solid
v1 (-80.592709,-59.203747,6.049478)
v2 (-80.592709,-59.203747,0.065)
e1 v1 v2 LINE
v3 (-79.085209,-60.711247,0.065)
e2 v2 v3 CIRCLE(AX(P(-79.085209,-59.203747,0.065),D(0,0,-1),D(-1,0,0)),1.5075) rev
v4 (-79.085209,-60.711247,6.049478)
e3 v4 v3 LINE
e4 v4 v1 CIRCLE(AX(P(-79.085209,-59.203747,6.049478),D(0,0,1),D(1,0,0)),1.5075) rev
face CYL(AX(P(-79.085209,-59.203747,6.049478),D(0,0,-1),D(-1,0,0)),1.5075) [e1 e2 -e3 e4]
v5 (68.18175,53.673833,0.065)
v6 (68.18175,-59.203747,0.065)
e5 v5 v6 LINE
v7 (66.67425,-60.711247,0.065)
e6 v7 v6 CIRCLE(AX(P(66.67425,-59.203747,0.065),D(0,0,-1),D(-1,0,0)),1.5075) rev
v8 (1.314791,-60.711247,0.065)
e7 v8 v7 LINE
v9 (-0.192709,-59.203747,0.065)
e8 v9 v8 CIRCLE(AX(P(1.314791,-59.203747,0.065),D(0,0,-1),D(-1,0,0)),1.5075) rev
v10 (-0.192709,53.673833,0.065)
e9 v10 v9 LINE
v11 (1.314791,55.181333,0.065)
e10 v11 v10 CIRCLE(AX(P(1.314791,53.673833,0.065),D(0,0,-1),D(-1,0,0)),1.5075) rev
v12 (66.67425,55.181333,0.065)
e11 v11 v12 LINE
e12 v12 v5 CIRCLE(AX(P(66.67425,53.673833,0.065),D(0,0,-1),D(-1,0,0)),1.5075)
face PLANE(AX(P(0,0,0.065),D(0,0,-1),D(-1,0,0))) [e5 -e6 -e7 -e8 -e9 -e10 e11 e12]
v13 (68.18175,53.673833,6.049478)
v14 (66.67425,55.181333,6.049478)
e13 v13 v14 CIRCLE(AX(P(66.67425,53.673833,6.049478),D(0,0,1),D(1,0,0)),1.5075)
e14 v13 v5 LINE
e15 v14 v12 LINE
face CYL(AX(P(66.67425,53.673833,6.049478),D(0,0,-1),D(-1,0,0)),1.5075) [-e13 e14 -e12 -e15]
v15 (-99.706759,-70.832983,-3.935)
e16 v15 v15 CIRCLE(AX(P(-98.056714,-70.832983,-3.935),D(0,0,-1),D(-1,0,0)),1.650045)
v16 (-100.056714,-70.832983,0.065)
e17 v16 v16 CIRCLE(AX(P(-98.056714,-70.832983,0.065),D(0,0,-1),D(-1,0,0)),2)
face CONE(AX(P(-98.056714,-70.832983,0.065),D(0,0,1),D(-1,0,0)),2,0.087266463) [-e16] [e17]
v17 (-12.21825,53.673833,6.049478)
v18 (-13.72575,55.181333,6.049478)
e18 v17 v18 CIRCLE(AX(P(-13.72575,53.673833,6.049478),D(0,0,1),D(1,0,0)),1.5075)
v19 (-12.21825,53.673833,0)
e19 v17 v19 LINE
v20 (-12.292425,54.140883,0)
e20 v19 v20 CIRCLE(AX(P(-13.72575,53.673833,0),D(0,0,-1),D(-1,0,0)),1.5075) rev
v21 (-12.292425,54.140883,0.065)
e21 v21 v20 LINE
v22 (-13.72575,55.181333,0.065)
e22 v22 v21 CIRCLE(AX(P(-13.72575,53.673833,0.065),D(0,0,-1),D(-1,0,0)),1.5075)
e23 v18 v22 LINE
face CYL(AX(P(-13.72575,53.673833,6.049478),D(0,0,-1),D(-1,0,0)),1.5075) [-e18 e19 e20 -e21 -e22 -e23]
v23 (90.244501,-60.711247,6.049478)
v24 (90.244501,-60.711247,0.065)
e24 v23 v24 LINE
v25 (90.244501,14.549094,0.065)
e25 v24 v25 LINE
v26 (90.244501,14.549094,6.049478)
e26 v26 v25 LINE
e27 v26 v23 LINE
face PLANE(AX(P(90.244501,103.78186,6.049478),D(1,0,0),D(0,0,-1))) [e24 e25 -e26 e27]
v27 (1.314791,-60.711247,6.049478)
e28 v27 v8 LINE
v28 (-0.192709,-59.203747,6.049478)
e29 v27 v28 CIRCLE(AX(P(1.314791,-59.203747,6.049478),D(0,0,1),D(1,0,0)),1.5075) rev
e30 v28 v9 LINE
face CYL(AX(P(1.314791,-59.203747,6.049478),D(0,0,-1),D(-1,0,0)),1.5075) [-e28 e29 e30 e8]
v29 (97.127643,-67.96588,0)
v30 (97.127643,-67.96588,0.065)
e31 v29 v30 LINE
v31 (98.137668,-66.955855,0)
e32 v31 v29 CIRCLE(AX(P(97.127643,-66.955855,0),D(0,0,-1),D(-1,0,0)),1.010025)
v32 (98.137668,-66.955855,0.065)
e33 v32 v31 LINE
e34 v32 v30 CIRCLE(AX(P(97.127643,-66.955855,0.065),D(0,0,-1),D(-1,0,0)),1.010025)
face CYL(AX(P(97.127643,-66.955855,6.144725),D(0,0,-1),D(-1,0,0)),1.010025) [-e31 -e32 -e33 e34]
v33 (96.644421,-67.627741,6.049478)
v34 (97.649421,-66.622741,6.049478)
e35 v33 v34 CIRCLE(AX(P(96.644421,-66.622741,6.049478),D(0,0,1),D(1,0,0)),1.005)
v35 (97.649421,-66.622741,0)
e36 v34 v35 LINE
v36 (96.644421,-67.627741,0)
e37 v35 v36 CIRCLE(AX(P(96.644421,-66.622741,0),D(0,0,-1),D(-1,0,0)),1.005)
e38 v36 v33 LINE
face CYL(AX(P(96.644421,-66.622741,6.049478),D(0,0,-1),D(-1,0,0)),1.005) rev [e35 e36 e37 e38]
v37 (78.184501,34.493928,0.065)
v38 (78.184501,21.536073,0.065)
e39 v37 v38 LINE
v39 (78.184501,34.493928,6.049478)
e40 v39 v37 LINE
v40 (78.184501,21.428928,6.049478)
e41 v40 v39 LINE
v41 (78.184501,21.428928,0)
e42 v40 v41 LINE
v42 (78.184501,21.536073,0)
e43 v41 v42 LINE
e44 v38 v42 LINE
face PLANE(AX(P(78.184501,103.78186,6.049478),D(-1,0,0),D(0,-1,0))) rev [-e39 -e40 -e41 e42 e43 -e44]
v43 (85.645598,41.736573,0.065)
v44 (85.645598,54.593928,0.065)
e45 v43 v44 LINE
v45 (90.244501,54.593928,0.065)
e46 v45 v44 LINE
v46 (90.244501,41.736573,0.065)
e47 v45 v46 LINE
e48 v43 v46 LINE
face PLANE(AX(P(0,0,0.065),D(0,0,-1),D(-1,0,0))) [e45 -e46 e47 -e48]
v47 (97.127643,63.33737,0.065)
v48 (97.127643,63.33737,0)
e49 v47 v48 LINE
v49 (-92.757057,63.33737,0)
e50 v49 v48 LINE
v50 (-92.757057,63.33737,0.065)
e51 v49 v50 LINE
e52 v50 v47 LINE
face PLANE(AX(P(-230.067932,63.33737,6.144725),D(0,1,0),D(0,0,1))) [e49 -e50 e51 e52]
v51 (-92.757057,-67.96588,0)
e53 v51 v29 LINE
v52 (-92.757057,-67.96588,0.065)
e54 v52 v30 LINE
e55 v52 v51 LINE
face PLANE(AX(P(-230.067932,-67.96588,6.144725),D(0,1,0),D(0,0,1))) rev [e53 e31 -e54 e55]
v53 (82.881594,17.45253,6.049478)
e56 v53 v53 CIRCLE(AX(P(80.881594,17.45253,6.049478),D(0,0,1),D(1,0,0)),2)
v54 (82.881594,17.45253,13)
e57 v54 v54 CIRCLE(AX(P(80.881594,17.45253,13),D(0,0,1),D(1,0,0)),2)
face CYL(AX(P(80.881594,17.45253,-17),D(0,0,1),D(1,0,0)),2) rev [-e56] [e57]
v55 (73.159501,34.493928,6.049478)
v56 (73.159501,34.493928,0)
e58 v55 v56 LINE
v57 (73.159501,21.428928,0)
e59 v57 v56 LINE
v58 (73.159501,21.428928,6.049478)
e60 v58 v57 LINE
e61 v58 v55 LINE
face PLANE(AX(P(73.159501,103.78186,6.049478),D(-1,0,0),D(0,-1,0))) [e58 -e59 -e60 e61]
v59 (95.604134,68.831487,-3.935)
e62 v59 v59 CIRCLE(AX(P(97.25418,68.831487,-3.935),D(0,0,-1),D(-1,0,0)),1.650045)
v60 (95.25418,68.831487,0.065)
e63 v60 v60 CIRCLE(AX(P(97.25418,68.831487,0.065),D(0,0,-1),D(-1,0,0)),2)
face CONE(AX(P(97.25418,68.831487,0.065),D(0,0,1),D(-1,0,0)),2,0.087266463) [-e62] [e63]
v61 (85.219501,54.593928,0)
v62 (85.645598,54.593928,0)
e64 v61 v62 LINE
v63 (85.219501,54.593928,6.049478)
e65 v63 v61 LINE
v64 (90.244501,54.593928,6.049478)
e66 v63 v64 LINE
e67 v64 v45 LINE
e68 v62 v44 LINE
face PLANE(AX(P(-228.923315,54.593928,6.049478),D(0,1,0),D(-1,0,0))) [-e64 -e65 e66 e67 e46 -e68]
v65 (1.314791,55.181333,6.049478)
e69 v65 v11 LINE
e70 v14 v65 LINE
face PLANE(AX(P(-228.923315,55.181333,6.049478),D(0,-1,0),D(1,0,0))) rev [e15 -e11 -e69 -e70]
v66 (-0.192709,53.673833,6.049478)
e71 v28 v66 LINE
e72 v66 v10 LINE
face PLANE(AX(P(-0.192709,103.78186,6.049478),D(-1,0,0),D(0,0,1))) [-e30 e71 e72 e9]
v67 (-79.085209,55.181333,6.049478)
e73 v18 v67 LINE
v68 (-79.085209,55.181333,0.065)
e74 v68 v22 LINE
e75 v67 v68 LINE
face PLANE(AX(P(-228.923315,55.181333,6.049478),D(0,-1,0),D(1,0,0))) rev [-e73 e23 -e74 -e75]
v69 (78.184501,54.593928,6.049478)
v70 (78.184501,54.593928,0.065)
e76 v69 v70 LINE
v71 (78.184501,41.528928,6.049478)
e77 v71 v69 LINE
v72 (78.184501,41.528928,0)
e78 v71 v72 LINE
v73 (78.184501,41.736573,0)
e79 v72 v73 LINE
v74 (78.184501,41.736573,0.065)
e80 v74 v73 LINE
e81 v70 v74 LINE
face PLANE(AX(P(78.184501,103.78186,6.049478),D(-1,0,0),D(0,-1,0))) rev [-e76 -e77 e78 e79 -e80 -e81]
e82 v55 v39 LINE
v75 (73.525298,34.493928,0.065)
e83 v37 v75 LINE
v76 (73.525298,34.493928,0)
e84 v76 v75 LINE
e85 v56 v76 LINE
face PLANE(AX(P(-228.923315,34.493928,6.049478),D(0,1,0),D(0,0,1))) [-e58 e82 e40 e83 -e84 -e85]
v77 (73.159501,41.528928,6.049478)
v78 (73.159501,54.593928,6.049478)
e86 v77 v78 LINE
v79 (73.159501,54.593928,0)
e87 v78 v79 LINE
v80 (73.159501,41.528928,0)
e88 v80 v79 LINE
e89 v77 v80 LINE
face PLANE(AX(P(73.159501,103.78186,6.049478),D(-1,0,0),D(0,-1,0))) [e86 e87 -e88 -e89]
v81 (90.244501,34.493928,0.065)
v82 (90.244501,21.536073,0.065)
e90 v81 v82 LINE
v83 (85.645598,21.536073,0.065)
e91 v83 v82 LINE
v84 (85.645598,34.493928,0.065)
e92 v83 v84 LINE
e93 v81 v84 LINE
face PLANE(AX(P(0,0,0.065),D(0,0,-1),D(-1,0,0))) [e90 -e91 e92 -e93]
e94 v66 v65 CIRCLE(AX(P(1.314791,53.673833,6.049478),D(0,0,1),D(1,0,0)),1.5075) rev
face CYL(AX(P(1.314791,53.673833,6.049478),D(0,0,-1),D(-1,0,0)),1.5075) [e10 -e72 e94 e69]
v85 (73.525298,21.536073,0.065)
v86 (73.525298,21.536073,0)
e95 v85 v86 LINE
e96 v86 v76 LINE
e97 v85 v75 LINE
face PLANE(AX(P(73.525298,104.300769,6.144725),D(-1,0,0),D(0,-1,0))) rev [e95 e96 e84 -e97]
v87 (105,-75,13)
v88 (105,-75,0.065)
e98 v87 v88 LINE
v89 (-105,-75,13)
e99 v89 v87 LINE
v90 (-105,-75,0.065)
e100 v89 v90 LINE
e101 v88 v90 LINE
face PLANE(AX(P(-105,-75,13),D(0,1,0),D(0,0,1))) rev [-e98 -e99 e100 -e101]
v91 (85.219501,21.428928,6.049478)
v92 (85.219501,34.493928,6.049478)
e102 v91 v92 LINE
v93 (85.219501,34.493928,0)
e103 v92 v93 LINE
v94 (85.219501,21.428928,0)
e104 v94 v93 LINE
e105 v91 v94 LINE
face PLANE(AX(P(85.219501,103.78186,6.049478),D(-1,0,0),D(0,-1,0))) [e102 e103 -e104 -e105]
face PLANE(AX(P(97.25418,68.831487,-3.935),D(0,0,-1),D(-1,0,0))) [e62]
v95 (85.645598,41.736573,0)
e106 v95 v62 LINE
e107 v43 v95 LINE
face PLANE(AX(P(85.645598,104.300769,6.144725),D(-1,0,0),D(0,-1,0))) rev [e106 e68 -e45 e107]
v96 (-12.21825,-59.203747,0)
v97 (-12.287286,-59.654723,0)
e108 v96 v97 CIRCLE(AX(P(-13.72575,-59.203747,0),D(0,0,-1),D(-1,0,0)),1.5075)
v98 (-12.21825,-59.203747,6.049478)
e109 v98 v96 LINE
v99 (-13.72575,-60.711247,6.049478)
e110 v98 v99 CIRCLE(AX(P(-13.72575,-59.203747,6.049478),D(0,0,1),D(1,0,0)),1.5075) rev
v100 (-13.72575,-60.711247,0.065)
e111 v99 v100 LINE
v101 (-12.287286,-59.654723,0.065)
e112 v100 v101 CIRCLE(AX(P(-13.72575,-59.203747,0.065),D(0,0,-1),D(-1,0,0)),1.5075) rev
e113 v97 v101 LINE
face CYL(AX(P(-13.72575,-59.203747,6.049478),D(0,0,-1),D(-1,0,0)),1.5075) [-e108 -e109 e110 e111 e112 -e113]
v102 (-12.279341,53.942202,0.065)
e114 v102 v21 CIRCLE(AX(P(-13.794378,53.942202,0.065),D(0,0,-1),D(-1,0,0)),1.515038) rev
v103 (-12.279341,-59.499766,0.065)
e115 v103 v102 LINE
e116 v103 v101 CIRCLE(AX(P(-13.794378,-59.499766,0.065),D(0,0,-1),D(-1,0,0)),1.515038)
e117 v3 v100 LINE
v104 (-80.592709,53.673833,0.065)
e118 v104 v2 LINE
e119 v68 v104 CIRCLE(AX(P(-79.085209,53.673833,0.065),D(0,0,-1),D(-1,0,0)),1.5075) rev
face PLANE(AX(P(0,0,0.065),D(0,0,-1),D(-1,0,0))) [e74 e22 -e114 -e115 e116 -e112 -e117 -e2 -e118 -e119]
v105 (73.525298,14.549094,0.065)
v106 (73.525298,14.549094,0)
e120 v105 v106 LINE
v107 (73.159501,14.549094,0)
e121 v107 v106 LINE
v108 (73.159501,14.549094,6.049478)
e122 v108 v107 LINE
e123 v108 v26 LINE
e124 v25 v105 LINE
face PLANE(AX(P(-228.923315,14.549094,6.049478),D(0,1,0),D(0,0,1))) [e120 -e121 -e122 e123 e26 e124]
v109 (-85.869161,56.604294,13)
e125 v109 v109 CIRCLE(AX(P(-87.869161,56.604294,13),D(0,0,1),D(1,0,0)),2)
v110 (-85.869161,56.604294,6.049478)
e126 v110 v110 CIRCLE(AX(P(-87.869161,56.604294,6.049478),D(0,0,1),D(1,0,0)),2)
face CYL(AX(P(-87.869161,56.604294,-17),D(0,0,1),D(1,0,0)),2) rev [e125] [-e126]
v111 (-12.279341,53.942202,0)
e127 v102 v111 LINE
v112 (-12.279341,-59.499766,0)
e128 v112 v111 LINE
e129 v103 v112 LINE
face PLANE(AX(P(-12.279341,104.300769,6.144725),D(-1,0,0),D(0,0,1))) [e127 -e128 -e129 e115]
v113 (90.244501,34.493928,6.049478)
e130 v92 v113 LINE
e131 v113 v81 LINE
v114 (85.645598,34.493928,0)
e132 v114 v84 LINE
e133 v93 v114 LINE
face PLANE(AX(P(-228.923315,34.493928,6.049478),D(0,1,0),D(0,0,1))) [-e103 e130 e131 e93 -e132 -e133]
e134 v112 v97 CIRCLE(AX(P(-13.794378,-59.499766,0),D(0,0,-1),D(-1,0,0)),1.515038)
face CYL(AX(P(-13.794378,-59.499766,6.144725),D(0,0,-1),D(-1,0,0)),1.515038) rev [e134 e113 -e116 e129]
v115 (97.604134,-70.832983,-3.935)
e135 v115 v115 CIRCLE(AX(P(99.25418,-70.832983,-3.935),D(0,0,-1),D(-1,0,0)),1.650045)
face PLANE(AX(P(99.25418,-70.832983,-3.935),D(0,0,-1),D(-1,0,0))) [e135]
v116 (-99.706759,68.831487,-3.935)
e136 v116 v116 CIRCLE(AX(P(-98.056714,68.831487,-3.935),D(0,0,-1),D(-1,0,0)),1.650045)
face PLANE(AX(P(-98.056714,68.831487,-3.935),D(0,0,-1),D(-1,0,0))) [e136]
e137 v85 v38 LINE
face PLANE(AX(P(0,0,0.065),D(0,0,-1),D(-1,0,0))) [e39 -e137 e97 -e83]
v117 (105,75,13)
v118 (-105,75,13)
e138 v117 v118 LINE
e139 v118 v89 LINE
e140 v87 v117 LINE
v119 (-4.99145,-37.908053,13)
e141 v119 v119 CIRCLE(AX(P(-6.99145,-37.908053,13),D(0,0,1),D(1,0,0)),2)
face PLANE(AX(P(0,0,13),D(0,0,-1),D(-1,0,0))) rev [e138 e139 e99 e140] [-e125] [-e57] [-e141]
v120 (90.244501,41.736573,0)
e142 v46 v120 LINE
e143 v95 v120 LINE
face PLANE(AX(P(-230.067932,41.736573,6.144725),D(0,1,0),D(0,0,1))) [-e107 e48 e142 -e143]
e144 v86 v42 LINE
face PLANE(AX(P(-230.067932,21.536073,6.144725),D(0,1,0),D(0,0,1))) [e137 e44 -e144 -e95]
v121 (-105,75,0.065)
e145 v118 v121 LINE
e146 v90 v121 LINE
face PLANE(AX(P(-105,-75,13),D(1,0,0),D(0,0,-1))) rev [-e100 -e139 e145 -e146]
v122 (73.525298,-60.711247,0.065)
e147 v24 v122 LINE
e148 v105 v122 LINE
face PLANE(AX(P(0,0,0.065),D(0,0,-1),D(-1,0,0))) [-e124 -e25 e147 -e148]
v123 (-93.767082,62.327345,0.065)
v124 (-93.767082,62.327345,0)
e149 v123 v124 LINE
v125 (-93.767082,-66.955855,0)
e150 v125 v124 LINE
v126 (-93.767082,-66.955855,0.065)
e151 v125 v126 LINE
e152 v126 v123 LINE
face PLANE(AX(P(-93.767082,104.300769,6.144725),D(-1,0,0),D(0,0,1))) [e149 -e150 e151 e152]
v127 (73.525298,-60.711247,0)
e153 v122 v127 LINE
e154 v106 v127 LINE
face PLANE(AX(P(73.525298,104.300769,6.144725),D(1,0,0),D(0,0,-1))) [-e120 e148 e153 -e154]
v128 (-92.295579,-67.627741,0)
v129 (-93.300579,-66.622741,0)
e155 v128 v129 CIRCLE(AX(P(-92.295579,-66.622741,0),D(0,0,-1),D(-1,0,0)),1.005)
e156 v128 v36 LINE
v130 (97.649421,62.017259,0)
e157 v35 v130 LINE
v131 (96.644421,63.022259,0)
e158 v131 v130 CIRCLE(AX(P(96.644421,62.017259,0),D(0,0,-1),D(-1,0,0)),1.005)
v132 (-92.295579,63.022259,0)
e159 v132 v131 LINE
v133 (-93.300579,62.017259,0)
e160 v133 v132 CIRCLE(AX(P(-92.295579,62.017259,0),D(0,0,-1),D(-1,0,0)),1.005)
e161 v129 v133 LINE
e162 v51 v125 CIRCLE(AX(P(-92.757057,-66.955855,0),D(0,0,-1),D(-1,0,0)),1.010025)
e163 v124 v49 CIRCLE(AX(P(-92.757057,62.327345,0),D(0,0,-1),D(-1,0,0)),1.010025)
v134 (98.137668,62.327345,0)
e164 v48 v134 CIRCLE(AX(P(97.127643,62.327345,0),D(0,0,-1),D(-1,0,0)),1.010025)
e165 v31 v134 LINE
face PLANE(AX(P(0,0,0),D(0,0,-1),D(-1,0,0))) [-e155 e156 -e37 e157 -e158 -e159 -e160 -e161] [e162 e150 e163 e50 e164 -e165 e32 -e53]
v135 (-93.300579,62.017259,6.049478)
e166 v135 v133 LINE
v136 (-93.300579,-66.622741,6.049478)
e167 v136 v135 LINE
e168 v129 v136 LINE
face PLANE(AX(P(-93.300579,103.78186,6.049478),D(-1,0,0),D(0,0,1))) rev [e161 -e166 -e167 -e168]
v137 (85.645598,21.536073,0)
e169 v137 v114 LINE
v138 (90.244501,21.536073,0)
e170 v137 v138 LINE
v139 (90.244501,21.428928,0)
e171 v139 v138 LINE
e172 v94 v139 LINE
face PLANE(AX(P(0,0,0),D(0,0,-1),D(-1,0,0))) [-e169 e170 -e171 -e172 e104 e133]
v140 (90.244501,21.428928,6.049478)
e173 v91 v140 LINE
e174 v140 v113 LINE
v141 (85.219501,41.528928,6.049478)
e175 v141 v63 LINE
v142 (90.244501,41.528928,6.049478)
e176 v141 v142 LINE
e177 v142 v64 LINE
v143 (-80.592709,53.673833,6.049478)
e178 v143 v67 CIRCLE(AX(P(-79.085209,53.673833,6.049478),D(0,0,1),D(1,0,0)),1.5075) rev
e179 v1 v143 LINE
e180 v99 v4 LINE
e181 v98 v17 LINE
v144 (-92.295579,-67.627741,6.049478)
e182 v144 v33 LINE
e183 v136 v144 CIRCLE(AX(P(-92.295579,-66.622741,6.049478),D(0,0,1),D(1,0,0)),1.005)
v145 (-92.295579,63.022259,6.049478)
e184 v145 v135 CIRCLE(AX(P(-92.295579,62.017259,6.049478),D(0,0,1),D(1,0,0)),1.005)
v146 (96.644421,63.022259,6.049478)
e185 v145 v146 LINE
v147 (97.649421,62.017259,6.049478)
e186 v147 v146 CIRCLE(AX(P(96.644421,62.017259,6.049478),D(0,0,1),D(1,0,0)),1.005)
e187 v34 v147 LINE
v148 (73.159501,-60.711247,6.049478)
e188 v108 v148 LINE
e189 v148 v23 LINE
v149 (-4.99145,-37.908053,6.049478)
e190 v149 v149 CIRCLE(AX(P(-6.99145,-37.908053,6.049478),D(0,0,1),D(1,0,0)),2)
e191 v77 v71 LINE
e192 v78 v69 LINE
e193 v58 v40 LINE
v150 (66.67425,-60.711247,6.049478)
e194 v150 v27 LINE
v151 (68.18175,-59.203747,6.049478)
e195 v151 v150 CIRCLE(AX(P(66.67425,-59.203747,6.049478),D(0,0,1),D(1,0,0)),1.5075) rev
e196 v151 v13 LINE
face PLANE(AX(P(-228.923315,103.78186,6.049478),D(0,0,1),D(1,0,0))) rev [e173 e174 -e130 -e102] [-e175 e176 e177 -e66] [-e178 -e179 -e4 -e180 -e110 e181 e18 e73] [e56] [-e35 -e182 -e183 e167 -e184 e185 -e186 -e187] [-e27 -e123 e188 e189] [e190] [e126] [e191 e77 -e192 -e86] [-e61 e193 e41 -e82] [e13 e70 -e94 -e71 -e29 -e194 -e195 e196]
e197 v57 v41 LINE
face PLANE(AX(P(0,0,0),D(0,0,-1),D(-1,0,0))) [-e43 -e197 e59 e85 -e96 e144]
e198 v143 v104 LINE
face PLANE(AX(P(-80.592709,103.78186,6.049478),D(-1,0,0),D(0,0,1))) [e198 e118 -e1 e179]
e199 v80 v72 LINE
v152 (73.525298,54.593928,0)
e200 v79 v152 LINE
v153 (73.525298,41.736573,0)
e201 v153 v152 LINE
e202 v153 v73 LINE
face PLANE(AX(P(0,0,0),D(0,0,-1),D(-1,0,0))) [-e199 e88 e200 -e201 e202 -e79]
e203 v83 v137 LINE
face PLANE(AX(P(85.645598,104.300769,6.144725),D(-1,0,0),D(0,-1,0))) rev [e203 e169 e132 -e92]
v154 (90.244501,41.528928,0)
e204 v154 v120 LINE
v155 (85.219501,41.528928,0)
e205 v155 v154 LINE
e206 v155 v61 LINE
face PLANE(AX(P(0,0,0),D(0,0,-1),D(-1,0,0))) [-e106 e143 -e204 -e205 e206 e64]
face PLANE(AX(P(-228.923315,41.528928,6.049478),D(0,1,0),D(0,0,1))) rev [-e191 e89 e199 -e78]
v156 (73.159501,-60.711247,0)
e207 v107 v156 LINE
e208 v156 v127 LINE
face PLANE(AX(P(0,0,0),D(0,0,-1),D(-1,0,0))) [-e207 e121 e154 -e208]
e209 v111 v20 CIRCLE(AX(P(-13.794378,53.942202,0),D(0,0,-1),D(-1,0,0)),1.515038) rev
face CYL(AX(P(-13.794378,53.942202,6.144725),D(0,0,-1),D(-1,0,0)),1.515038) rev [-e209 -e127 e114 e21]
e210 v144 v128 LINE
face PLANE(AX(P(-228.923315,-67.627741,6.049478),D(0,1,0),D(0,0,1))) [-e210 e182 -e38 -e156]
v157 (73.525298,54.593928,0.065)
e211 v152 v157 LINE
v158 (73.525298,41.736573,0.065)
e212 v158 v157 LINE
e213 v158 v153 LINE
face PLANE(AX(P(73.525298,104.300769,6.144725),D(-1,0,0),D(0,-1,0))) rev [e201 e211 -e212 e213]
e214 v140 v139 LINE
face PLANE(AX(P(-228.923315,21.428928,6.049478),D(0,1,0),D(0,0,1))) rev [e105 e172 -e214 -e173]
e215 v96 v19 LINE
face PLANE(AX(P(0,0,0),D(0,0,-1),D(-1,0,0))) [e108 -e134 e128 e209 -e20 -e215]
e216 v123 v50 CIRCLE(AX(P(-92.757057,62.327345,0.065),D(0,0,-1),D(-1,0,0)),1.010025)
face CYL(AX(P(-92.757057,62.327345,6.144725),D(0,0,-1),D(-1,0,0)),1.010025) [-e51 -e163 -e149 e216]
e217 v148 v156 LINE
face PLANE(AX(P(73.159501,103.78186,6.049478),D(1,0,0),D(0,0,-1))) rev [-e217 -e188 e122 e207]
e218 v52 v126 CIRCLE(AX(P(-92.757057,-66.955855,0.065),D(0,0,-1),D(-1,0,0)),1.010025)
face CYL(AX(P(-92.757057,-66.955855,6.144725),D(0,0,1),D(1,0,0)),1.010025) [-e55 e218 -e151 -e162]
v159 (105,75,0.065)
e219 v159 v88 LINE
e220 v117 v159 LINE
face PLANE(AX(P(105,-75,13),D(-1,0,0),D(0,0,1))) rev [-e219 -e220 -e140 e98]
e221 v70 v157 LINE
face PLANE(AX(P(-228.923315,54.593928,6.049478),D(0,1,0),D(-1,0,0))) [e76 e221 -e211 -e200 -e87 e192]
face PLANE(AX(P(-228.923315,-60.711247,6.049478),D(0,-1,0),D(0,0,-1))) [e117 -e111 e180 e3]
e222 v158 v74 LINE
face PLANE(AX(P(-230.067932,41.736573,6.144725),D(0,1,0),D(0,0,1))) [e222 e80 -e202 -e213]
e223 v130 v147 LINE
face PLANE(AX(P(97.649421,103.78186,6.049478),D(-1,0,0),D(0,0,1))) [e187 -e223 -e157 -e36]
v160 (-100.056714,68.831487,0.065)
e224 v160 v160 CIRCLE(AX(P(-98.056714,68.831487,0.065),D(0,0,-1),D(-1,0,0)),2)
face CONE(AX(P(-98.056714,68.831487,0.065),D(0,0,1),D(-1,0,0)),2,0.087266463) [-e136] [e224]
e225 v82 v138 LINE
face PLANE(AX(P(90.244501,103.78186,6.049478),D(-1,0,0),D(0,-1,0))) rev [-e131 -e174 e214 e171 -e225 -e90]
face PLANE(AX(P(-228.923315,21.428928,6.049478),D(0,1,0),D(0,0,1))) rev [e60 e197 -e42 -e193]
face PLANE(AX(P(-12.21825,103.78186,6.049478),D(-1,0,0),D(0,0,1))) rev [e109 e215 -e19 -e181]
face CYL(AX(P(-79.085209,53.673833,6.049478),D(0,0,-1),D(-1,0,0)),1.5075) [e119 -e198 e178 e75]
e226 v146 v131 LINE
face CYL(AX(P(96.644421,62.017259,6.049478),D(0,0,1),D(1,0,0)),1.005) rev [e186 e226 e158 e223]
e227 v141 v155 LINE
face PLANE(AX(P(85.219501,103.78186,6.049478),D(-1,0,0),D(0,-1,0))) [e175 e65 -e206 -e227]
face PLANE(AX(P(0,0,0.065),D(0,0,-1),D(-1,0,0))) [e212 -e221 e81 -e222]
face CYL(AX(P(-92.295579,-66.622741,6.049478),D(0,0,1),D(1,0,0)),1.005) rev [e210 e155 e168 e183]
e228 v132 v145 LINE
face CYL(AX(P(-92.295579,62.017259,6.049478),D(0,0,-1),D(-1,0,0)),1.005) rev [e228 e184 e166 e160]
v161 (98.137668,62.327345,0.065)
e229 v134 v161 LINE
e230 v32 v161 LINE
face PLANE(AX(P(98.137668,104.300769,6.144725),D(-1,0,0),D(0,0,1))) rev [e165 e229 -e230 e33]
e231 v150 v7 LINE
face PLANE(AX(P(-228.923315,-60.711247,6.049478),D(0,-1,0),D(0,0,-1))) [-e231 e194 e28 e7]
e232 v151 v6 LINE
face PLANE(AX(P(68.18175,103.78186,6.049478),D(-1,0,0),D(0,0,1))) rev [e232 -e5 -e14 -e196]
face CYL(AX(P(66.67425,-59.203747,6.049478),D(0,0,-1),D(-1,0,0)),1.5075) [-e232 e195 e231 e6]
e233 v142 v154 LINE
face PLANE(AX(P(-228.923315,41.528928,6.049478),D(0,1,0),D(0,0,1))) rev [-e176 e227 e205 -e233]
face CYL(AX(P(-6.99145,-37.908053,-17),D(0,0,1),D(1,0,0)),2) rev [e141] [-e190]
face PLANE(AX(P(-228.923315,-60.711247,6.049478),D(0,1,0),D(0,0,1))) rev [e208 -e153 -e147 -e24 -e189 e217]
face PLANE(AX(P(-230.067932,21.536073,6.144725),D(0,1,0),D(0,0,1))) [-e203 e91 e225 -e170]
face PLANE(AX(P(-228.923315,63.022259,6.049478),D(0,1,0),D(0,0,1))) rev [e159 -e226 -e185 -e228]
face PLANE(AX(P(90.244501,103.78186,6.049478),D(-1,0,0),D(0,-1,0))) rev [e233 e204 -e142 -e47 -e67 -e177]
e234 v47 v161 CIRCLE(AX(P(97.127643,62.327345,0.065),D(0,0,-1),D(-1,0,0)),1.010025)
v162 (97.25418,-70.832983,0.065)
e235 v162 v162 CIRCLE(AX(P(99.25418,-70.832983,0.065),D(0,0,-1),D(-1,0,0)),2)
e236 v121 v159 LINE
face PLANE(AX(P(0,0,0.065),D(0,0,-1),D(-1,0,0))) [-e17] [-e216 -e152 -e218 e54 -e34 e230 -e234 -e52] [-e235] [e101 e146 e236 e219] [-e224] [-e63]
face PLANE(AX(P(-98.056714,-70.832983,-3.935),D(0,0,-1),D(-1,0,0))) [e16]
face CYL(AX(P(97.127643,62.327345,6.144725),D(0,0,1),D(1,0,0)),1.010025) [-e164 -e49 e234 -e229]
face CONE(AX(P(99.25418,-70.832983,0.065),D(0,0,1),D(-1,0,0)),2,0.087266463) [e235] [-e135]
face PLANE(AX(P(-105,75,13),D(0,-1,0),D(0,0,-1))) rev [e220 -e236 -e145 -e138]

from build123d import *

# Parameters (mm, degrees)
ESQUISSE1_W                  = 210
ESQUISSE1_H                  = 150
BOSS_EXTRU_1_DEPTH           = 13
EMPREINTE1_OUTLINE_W         = 17.085
EMPREINTE1_OUTLINE_H         = 75.260341386
EMPREINTE1_OUTLINE_W_2       = 5.025
EMPREINTE1_OUTLINE_H_2       = 13.065
EMPREINTE1_DEPTH             = 6.049477858
ESQUISSE2_R                  = 2
ENL_V_MAT_EXTRU_1_DEPTH      = 30
ESQUISSE3_R                  = 2
BOSS_EXTRU_2_DEPTH           = 4
BOSS_EXTRU_2_DRAFT           = 5
BOSS_EXTRU_2_PROFILE_2_DEPTH = 4
BOSS_EXTRU_2_PROFILE_2_DRAFT = 5
BOSS_EXTRU_2_PROFILE_3_DEPTH = 4
BOSS_EXTRU_2_PROFILE_3_DRAFT = 5
BOSS_EXTRU_2_PROFILE_4_DEPTH = 4
BOSS_EXTRU_2_PROFILE_4_DRAFT = 5
EMPREINTE2_START             = -4
EMPREINTE2_OUTLINE_W         = 210
EMPREINTE2_OUTLINE_H         = 150
EMPREINTE2_OUTLINE_W_2       = 4.598902496
EMPREINTE2_OUTLINE_H_2       = 12.85735536
EMPREINTE2_OUTLINE_H_3       = 12.95785536
EMPREINTE2_OUTLINE_W_3       = 4.659202496
EMPREINTE2_OUTLINE_W_4       = 16.719202496
EMPREINTE2_OUTLINE_H_4       = 75.260341386
EMPREINTE2_DEPTH             = 4.065
ESQUISSE4_R                  = 2
BOSS_EXTRU_3_DEPTH           = 4
BOSS_EXTRU_3_DRAFT           = 5
BOSS_EXTRU_3_PROFILE_2_DEPTH = 4
BOSS_EXTRU_3_PROFILE_2_DRAFT = 5
BOSS_EXTRU_3_PROFILE_3_DEPTH = 4
BOSS_EXTRU_3_PROFILE_3_DRAFT = 5
BOSS_EXTRU_3_PROFILE_4_DEPTH = 4
BOSS_EXTRU_3_PROFILE_4_DRAFT = 5


# Read off the part's stored shape, not the designer's step: Empreinte1, Empreinte2
with BuildPart() as part:
    # Esquisse1 → Boss.-Extru.1 (new body)
    with BuildSketch(Plane.XY):
        Rectangle(ESQUISSE1_W, ESQUISSE1_H)
    extrude(amount=BOSS_EXTRU_1_DEPTH)

    # Empreinte1 outline → Empreinte1 (cut)
    with BuildSketch(Plane.XY):
        with BuildLine():
            Line((-92.295579376, -67.627741397), (96.644420624, -67.627741397))
            ThreePointArc((96.644420624, -67.627741397), (97.355062939, -67.333383712), (97.649420624, -66.622741397))
            Line((97.649420624, -66.622741397), (97.649420624, 62.017258603))
            ThreePointArc((97.649420624, 62.017258603), (97.35506294, 62.727900918), (96.644420624, 63.022258603))
            Line((96.644420624, 63.022258603), (-92.295579376, 63.022258603))
            ThreePointArc((-92.295579376, 63.022258603), (-93.006221692, 62.727900918), (-93.300579376, 62.017258603))
            Line((-93.300579376, 62.017258603), (-93.300579376, -66.622741397))
            ThreePointArc((-93.300579376, -66.622741397), (-93.006221691, -67.333383712), (-92.295579376, -67.627741397))
        make_face()
        with BuildLine():
            Line((-13.725749511, -60.711247466), (-79.085208702, -60.711247466))
            ThreePointArc((-79.085208702, -60.711247466), (-80.151172175, -60.269710939), (-80.592708702, -59.203747466))
            Line((-80.592708702, -59.203747466), (-80.592708702, 53.673832534))
            ThreePointArc((-80.592708702, 53.673832534), (-80.151172175, 54.739796007), (-79.085208702, 55.181332534))
            Line((-79.085208702, 55.181332534), (-13.725749511, 55.181332534))
            ThreePointArc((-13.725749511, 55.181332534), (-12.659786038, 54.739796007), (-12.218249511, 53.673832534))
            Line((-12.218249511, 53.673832534), (-12.218249511, -59.203747466))
            ThreePointArc((-12.218249511, -59.203747466), (-12.659786038, -60.269710939), (-13.725749511, -60.711247466))
        make_face(mode=Mode.SUBTRACT)
        with BuildLine():
            Line((66.674250489, -60.711247466), (1.314791298, -60.711247466))
            ThreePointArc((1.314791298, -60.711247466), (0.248827825, -60.269710939), (-0.192708702, -59.203747466))
            Line((-0.192708702, -59.203747466), (-0.192708702, 53.673832534))
            ThreePointArc((-0.192708702, 53.673832534), (0.248827825, 54.739796007), (1.314791298, 55.181332534))
            Line((1.314791298, 55.181332534), (66.674250489, 55.181332534))
            ThreePointArc((66.674250489, 55.181332534), (67.740213962, 54.739796007), (68.181750489, 53.673832534))
            Line((68.181750489, 53.673832534), (68.181750489, -59.203747466))
            ThreePointArc((68.181750489, -59.203747466), (67.740213962, -60.269710939), (66.674250489, -60.711247466))
        make_face(mode=Mode.SUBTRACT)
        with Locations((81.702000923, -23.081076773)):
            Rectangle(EMPREINTE1_OUTLINE_W, EMPREINTE1_OUTLINE_H, mode=Mode.SUBTRACT)
        with Locations((75.672000923, 27.96142794)):
            Rectangle(EMPREINTE1_OUTLINE_W_2, EMPREINTE1_OUTLINE_H_2, mode=Mode.SUBTRACT)
        with Locations((87.732000923, 27.96142794)):
            Rectangle(EMPREINTE1_OUTLINE_W_2, EMPREINTE1_OUTLINE_H_2, mode=Mode.SUBTRACT)
        with Locations((75.672000923, 48.06142794)):
            Rectangle(EMPREINTE1_OUTLINE_W_2, EMPREINTE1_OUTLINE_H_2, mode=Mode.SUBTRACT)
        with Locations((87.732000923, 48.06142794)):
            Rectangle(EMPREINTE1_OUTLINE_W_2, EMPREINTE1_OUTLINE_H_2, mode=Mode.SUBTRACT)
    extrude(amount=EMPREINTE1_DEPTH, mode=Mode.SUBTRACT)

    # Esquisse2 → Enlèv. mat.-Extru.1 (cut)
    with BuildSketch(Plane.XY.offset(13)):
        with Locations((-87.86916098, 56.604294197)):
            Circle(ESQUISSE2_R)
        with Locations((80.881593918, 17.452530083)):
            Circle(ESQUISSE2_R)
        with Locations((-6.991449763, -37.908053034)):
            Circle(ESQUISSE2_R)
    extrude(amount=-ENL_V_MAT_EXTRU_1_DEPTH, mode=Mode.SUBTRACT)


with BuildPart() as boss_extru_2_tool:
    # Esquisse3 → Boss.-Extru.2 (with draft: the straight prism first)
    with BuildSketch(Plane(origin=(0, 0, 0), x_dir=(-1, 0, 0), z_dir=(0, 0, -1))):
        with Locations((-100.155653932, 68.889368264)):
            Circle(ESQUISSE3_R)
    extrude(amount=BOSS_EXTRU_2_DEPTH)
    # Boss.-Extru.2: the draft: its side faces are tilted about the plane it starts from
    boss_extru_2_sides = [boss_extru_2_tool.faces().sort_by_distance(p)[0] for p in [
        (102.155653932, 68.889368264, -2),
    ]]
    draft(boss_extru_2_sides, Plane(origin=(0, 0, 0), x_dir=(-1, 0, 0), z_dir=(0, 0, -1)), BOSS_EXTRU_2_DRAFT)


with BuildPart() as part_1:
    add(part.part)

    # Boss.-Extru.2: add boss_extru_2_tool
    add(boss_extru_2_tool.part)


with BuildPart() as boss_extru_2_profile_2_tool:
    # Esquisse3 → Boss.-Extru.2 profile 2 (with draft: the straight prism first)
    with BuildSketch(Plane(origin=(0, 0, 0), x_dir=(-1, 0, 0), z_dir=(0, 0, -1))):
        with Locations((98.736763649, 70.889368264)):
            Circle(ESQUISSE3_R)
    extrude(amount=BOSS_EXTRU_2_PROFILE_2_DEPTH)
    # Boss.-Extru.2 profile 2: the draft: its side faces are tilted about the plane it starts from
    boss_extru_2_profile_2_sides = [boss_extru_2_profile_2_tool.faces().sort_by_distance(p)[0] for p in [
        (-96.736763649, 70.889368264, -2),
    ]]
    draft(boss_extru_2_profile_2_sides, Plane(origin=(0, 0, 0), x_dir=(-1, 0, 0), z_dir=(0, 0, -1)), BOSS_EXTRU_2_PROFILE_2_DRAFT)


with BuildPart() as part_2:
    add(part_1.part)

    # Boss.-Extru.2 profile 2: add boss_extru_2_profile_2_tool
    add(boss_extru_2_profile_2_tool.part)


with BuildPart() as boss_extru_2_profile_3_tool:
    # Esquisse3 → Boss.-Extru.2 profile 3 (with draft: the straight prism first)
    with BuildSketch(Plane(origin=(0, 0, 0), x_dir=(-1, 0, 0), z_dir=(0, 0, -1))):
        with Locations((98.736763649, -70.420119621)):
            Circle(ESQUISSE3_R)
    extrude(amount=BOSS_EXTRU_2_PROFILE_3_DEPTH)
    # Boss.-Extru.2 profile 3: the draft: its side faces are tilted about the plane it starts from
    boss_extru_2_profile_3_sides = [boss_extru_2_profile_3_tool.faces().sort_by_distance(p)[0] for p in [
        (-96.736763649, -70.420119621, -2),
    ]]
    draft(boss_extru_2_profile_3_sides, Plane(origin=(0, 0, 0), x_dir=(-1, 0, 0), z_dir=(0, 0, -1)), BOSS_EXTRU_2_PROFILE_3_DRAFT)


with BuildPart() as part_3:
    add(part_2.part)

    # Boss.-Extru.2 profile 3: add boss_extru_2_profile_3_tool
    add(boss_extru_2_profile_3_tool.part)


with BuildPart() as boss_extru_2_profile_4_tool:
    # Esquisse3 → Boss.-Extru.2 profile 4 (with draft: the straight prism first)
    with BuildSketch(Plane(origin=(0, 0, 0), x_dir=(-1, 0, 0), z_dir=(0, 0, -1))):
        with Locations((-36.278038097, -50.689996009)):
            Circle(ESQUISSE3_R)
    extrude(amount=BOSS_EXTRU_2_PROFILE_4_DEPTH)
    # Boss.-Extru.2 profile 4: the draft: its side faces are tilted about the plane it starts from
    boss_extru_2_profile_4_sides = [boss_extru_2_profile_4_tool.faces().sort_by_distance(p)[0] for p in [
        (38.278038097, -50.689996009, -2),
    ]]
    draft(boss_extru_2_profile_4_sides, Plane(origin=(0, 0, 0), x_dir=(-1, 0, 0), z_dir=(0, 0, -1)), BOSS_EXTRU_2_PROFILE_4_DRAFT)


with BuildPart() as part_4:
    add(part_3.part)

    # Boss.-Extru.2 profile 4: add boss_extru_2_profile_4_tool
    add(boss_extru_2_profile_4_tool.part)

    # Empreinte2 outline → Empreinte2 (cut)
    # profile 1 of 8: a face of its own
    with BuildSketch(Plane.XY.offset(EMPREINTE2_START)):
        Rectangle(EMPREINTE2_OUTLINE_W, EMPREINTE2_OUTLINE_H)
        with BuildLine():
            ThreePointArc((98.137667727, -66.955855104), (97.841838253, -67.67005063), (97.127642727, -67.965880104))
            Line((97.127642727, -67.965880104), (-92.757057273, -67.965880104))
            ThreePointArc((-92.757057273, -67.965880104), (-93.4712528, -67.670050631), (-93.767082273, -66.955855104))
            Line((-93.767082273, -66.955855104), (-93.767082273, 62.327344896))
            ThreePointArc((-93.767082273, 62.327344896), (-93.4712528, 63.041540423), (-92.757057273, 63.337369896))
            Line((-92.757057273, 63.337369896), (97.127642727, 63.337369896))
            ThreePointArc((97.127642727, 63.337369896), (97.841838254, 63.041540423), (98.137667727, 62.327344896))
            Line((98.137667727, 62.327344896), (98.137667727, -66.955855104))
        make_face(mode=Mode.SUBTRACT)
    # profile 2 of 8: a face of its own
    with BuildSketch(Plane.XY.offset(EMPREINTE2_START)):
        with BuildLine():
            ThreePointArc((-12.287286036, -59.654723166), (-12.281328382, -59.577346464), (-12.279340759, -59.499766203))
            Line((-12.279340759, -59.499766203), (-12.279340759, 53.942201697))
            ThreePointArc((-12.279340759, 53.942201697), (-12.282615306, 54.041757722), (-12.292424794, 54.140883394))
            ThreePointArc((-12.292424794, 54.140883394), (-12.840177075, 54.893798809), (-13.725749511, 55.181332534))
            Line((-13.725749511, 55.181332534), (-79.085208702, 55.181332534))
            ThreePointArc((-79.085208702, 55.181332534), (-80.151172175, 54.739796007), (-80.592708702, 53.673832534))
            Line((-80.592708702, 53.673832534), (-80.592708702, -59.203747466))
            ThreePointArc((-80.592708702, -59.203747466), (-80.151172175, -60.269710939), (-79.085208702, -60.711247466))
            Line((-79.085208702, -60.711247466), (-13.725749511, -60.711247466))
            ThreePointArc((-13.725749511, -60.711247466), (-12.833362156, -60.418737614), (-12.287286036, -59.654723166))
        make_face()
    # profile 3 of 8: a face of its own
    with BuildSketch(Plane.XY.offset(EMPREINTE2_START)):
        with Locations((87.945049675, 48.16525026)):
            Rectangle(EMPREINTE2_OUTLINE_W_2, EMPREINTE2_OUTLINE_H_2)
    # profile 4 of 8: a face of its own
    with BuildSketch(Plane.XY.offset(EMPREINTE2_START)):
        with Locations((87.945049675, 28.01500026)):
            Rectangle(EMPREINTE2_OUTLINE_W_2, EMPREINTE2_OUTLINE_H_3)
    # profile 5 of 8: a face of its own
    with BuildSketch(Plane.XY.offset(EMPREINTE2_START)):
        with Locations((75.854899675, 48.16525026)):
            Rectangle(EMPREINTE2_OUTLINE_W_3, EMPREINTE2_OUTLINE_H_2)
    # profile 6 of 8: a face of its own
    with BuildSketch(Plane.XY.offset(EMPREINTE2_START)):
        with Locations((75.854899675, 28.01500026)):
            Rectangle(EMPREINTE2_OUTLINE_W_3, EMPREINTE2_OUTLINE_H_3)
    # profile 7 of 8: a face of its own
    with BuildSketch(Plane.XY.offset(EMPREINTE2_START)):
        with Locations((81.884899675, -23.081076773)):
            Rectangle(EMPREINTE2_OUTLINE_W_4, EMPREINTE2_OUTLINE_H_4)
    # profile 8 of 8: a face of its own
    with BuildSketch(Plane.XY.offset(EMPREINTE2_START)):
        with BuildLine():
            ThreePointArc((-0.192708702, -59.203747466), (0.248827825, -60.269710939), (1.314791298, -60.711247466))
            Line((1.314791298, -60.711247466), (66.674250489, -60.711247466))
            ThreePointArc((66.674250489, -60.711247466), (67.740213962, -60.269710939), (68.181750489, -59.203747466))
            Line((68.181750489, -59.203747466), (68.181750489, 53.673832534))
            ThreePointArc((68.181750489, 53.673832534), (67.740213962, 54.739796007), (66.674250489, 55.181332534))
            Line((66.674250489, 55.181332534), (1.314791298, 55.181332534))
            ThreePointArc((1.314791298, 55.181332534), (0.248827825, 54.739796007), (-0.192708702, 53.673832534))
            Line((-0.192708702, 53.673832534), (-0.192708702, -59.203747466))
        make_face()
    extrude(amount=EMPREINTE2_DEPTH, mode=Mode.SUBTRACT)


with BuildPart() as boss_extru_3_tool:
    # Esquisse4 → Boss.-Extru.3 (with draft: the straight prism first)
    with BuildSketch(Plane(origin=(0, 0, 0.065), x_dir=(-1, 0, 0), z_dir=(0, 0, -1))):
        with Locations((-97.25417956, 68.831486837)):
            Circle(ESQUISSE4_R)
    extrude(amount=BOSS_EXTRU_3_DEPTH)
    # Boss.-Extru.3: the draft: its side faces are tilted about the plane it starts from
    boss_extru_3_sides = [boss_extru_3_tool.faces().sort_by_distance(p)[0] for p in [
        (99.25417956, 68.831486837, -1.935),
    ]]
    draft(boss_extru_3_sides, Plane(origin=(0, 0, 0.065), x_dir=(-1, 0, 0), z_dir=(0, 0, -1)), BOSS_EXTRU_3_DRAFT)


with BuildPart() as part_5:
    add(part_4.part)

    # Boss.-Extru.3: add boss_extru_3_tool
    add(boss_extru_3_tool.part)


with BuildPart() as boss_extru_3_profile_2_tool:
    # Esquisse4 → Boss.-Extru.3 profile 2 (with draft: the straight prism first)
    with BuildSketch(Plane(origin=(0, 0, 0.065), x_dir=(-1, 0, 0), z_dir=(0, 0, -1))):
        with Locations((98.056714057, 68.831486837)):
            Circle(ESQUISSE4_R)
    extrude(amount=BOSS_EXTRU_3_PROFILE_2_DEPTH)
    # Boss.-Extru.3 profile 2: the draft: its side faces are tilted about the plane it starts from
    boss_extru_3_profile_2_sides = [boss_extru_3_profile_2_tool.faces().sort_by_distance(p)[0] for p in [
        (-96.056714057, 68.831486837, -1.935),
    ]]
    draft(boss_extru_3_profile_2_sides, Plane(origin=(0, 0, 0.065), x_dir=(-1, 0, 0), z_dir=(0, 0, -1)), BOSS_EXTRU_3_PROFILE_2_DRAFT)


with BuildPart() as part_6:
    add(part_5.part)

    # Boss.-Extru.3 profile 2: add boss_extru_3_profile_2_tool
    add(boss_extru_3_profile_2_tool.part)


with BuildPart() as boss_extru_3_profile_3_tool:
    # Esquisse4 → Boss.-Extru.3 profile 3 (with draft: the straight prism first)
    with BuildSketch(Plane(origin=(0, 0, 0.065), x_dir=(-1, 0, 0), z_dir=(0, 0, -1))):
        with Locations((-99.25417956, -70.832982535)):
            Circle(ESQUISSE4_R)
    extrude(amount=BOSS_EXTRU_3_PROFILE_3_DEPTH)
    # Boss.-Extru.3 profile 3: the draft: its side faces are tilted about the plane it starts from
    boss_extru_3_profile_3_sides = [boss_extru_3_profile_3_tool.faces().sort_by_distance(p)[0] for p in [
        (101.25417956, -70.832982535, -1.935),
    ]]
    draft(boss_extru_3_profile_3_sides, Plane(origin=(0, 0, 0.065), x_dir=(-1, 0, 0), z_dir=(0, 0, -1)), BOSS_EXTRU_3_PROFILE_3_DRAFT)


with BuildPart() as part_7:
    add(part_6.part)

    # Boss.-Extru.3 profile 3: add boss_extru_3_profile_3_tool
    add(boss_extru_3_profile_3_tool.part)


with BuildPart() as boss_extru_3_profile_4_tool:
    # Esquisse4 → Boss.-Extru.3 profile 4 (with draft: the straight prism first)
    with BuildSketch(Plane(origin=(0, 0, 0.065), x_dir=(-1, 0, 0), z_dir=(0, 0, -1))):
        with Locations((98.056714057, -70.832982535)):
            Circle(ESQUISSE4_R)
    extrude(amount=BOSS_EXTRU_3_PROFILE_4_DEPTH)
    # Boss.-Extru.3 profile 4: the draft: its side faces are tilted about the plane it starts from
    boss_extru_3_profile_4_sides = [boss_extru_3_profile_4_tool.faces().sort_by_distance(p)[0] for p in [
        (-96.056714057, -70.832982535, -1.935),
    ]]
    draft(boss_extru_3_profile_4_sides, Plane(origin=(0, 0, 0.065), x_dir=(-1, 0, 0), z_dir=(0, 0, -1)), BOSS_EXTRU_3_PROFILE_4_DRAFT)


with BuildPart() as part_8:
    add(part_7.part)

    # Boss.-Extru.3 profile 4: add boss_extru_3_profile_4_tool
    add(boss_extru_3_profile_4_tool.part)


solid = part_8.part
